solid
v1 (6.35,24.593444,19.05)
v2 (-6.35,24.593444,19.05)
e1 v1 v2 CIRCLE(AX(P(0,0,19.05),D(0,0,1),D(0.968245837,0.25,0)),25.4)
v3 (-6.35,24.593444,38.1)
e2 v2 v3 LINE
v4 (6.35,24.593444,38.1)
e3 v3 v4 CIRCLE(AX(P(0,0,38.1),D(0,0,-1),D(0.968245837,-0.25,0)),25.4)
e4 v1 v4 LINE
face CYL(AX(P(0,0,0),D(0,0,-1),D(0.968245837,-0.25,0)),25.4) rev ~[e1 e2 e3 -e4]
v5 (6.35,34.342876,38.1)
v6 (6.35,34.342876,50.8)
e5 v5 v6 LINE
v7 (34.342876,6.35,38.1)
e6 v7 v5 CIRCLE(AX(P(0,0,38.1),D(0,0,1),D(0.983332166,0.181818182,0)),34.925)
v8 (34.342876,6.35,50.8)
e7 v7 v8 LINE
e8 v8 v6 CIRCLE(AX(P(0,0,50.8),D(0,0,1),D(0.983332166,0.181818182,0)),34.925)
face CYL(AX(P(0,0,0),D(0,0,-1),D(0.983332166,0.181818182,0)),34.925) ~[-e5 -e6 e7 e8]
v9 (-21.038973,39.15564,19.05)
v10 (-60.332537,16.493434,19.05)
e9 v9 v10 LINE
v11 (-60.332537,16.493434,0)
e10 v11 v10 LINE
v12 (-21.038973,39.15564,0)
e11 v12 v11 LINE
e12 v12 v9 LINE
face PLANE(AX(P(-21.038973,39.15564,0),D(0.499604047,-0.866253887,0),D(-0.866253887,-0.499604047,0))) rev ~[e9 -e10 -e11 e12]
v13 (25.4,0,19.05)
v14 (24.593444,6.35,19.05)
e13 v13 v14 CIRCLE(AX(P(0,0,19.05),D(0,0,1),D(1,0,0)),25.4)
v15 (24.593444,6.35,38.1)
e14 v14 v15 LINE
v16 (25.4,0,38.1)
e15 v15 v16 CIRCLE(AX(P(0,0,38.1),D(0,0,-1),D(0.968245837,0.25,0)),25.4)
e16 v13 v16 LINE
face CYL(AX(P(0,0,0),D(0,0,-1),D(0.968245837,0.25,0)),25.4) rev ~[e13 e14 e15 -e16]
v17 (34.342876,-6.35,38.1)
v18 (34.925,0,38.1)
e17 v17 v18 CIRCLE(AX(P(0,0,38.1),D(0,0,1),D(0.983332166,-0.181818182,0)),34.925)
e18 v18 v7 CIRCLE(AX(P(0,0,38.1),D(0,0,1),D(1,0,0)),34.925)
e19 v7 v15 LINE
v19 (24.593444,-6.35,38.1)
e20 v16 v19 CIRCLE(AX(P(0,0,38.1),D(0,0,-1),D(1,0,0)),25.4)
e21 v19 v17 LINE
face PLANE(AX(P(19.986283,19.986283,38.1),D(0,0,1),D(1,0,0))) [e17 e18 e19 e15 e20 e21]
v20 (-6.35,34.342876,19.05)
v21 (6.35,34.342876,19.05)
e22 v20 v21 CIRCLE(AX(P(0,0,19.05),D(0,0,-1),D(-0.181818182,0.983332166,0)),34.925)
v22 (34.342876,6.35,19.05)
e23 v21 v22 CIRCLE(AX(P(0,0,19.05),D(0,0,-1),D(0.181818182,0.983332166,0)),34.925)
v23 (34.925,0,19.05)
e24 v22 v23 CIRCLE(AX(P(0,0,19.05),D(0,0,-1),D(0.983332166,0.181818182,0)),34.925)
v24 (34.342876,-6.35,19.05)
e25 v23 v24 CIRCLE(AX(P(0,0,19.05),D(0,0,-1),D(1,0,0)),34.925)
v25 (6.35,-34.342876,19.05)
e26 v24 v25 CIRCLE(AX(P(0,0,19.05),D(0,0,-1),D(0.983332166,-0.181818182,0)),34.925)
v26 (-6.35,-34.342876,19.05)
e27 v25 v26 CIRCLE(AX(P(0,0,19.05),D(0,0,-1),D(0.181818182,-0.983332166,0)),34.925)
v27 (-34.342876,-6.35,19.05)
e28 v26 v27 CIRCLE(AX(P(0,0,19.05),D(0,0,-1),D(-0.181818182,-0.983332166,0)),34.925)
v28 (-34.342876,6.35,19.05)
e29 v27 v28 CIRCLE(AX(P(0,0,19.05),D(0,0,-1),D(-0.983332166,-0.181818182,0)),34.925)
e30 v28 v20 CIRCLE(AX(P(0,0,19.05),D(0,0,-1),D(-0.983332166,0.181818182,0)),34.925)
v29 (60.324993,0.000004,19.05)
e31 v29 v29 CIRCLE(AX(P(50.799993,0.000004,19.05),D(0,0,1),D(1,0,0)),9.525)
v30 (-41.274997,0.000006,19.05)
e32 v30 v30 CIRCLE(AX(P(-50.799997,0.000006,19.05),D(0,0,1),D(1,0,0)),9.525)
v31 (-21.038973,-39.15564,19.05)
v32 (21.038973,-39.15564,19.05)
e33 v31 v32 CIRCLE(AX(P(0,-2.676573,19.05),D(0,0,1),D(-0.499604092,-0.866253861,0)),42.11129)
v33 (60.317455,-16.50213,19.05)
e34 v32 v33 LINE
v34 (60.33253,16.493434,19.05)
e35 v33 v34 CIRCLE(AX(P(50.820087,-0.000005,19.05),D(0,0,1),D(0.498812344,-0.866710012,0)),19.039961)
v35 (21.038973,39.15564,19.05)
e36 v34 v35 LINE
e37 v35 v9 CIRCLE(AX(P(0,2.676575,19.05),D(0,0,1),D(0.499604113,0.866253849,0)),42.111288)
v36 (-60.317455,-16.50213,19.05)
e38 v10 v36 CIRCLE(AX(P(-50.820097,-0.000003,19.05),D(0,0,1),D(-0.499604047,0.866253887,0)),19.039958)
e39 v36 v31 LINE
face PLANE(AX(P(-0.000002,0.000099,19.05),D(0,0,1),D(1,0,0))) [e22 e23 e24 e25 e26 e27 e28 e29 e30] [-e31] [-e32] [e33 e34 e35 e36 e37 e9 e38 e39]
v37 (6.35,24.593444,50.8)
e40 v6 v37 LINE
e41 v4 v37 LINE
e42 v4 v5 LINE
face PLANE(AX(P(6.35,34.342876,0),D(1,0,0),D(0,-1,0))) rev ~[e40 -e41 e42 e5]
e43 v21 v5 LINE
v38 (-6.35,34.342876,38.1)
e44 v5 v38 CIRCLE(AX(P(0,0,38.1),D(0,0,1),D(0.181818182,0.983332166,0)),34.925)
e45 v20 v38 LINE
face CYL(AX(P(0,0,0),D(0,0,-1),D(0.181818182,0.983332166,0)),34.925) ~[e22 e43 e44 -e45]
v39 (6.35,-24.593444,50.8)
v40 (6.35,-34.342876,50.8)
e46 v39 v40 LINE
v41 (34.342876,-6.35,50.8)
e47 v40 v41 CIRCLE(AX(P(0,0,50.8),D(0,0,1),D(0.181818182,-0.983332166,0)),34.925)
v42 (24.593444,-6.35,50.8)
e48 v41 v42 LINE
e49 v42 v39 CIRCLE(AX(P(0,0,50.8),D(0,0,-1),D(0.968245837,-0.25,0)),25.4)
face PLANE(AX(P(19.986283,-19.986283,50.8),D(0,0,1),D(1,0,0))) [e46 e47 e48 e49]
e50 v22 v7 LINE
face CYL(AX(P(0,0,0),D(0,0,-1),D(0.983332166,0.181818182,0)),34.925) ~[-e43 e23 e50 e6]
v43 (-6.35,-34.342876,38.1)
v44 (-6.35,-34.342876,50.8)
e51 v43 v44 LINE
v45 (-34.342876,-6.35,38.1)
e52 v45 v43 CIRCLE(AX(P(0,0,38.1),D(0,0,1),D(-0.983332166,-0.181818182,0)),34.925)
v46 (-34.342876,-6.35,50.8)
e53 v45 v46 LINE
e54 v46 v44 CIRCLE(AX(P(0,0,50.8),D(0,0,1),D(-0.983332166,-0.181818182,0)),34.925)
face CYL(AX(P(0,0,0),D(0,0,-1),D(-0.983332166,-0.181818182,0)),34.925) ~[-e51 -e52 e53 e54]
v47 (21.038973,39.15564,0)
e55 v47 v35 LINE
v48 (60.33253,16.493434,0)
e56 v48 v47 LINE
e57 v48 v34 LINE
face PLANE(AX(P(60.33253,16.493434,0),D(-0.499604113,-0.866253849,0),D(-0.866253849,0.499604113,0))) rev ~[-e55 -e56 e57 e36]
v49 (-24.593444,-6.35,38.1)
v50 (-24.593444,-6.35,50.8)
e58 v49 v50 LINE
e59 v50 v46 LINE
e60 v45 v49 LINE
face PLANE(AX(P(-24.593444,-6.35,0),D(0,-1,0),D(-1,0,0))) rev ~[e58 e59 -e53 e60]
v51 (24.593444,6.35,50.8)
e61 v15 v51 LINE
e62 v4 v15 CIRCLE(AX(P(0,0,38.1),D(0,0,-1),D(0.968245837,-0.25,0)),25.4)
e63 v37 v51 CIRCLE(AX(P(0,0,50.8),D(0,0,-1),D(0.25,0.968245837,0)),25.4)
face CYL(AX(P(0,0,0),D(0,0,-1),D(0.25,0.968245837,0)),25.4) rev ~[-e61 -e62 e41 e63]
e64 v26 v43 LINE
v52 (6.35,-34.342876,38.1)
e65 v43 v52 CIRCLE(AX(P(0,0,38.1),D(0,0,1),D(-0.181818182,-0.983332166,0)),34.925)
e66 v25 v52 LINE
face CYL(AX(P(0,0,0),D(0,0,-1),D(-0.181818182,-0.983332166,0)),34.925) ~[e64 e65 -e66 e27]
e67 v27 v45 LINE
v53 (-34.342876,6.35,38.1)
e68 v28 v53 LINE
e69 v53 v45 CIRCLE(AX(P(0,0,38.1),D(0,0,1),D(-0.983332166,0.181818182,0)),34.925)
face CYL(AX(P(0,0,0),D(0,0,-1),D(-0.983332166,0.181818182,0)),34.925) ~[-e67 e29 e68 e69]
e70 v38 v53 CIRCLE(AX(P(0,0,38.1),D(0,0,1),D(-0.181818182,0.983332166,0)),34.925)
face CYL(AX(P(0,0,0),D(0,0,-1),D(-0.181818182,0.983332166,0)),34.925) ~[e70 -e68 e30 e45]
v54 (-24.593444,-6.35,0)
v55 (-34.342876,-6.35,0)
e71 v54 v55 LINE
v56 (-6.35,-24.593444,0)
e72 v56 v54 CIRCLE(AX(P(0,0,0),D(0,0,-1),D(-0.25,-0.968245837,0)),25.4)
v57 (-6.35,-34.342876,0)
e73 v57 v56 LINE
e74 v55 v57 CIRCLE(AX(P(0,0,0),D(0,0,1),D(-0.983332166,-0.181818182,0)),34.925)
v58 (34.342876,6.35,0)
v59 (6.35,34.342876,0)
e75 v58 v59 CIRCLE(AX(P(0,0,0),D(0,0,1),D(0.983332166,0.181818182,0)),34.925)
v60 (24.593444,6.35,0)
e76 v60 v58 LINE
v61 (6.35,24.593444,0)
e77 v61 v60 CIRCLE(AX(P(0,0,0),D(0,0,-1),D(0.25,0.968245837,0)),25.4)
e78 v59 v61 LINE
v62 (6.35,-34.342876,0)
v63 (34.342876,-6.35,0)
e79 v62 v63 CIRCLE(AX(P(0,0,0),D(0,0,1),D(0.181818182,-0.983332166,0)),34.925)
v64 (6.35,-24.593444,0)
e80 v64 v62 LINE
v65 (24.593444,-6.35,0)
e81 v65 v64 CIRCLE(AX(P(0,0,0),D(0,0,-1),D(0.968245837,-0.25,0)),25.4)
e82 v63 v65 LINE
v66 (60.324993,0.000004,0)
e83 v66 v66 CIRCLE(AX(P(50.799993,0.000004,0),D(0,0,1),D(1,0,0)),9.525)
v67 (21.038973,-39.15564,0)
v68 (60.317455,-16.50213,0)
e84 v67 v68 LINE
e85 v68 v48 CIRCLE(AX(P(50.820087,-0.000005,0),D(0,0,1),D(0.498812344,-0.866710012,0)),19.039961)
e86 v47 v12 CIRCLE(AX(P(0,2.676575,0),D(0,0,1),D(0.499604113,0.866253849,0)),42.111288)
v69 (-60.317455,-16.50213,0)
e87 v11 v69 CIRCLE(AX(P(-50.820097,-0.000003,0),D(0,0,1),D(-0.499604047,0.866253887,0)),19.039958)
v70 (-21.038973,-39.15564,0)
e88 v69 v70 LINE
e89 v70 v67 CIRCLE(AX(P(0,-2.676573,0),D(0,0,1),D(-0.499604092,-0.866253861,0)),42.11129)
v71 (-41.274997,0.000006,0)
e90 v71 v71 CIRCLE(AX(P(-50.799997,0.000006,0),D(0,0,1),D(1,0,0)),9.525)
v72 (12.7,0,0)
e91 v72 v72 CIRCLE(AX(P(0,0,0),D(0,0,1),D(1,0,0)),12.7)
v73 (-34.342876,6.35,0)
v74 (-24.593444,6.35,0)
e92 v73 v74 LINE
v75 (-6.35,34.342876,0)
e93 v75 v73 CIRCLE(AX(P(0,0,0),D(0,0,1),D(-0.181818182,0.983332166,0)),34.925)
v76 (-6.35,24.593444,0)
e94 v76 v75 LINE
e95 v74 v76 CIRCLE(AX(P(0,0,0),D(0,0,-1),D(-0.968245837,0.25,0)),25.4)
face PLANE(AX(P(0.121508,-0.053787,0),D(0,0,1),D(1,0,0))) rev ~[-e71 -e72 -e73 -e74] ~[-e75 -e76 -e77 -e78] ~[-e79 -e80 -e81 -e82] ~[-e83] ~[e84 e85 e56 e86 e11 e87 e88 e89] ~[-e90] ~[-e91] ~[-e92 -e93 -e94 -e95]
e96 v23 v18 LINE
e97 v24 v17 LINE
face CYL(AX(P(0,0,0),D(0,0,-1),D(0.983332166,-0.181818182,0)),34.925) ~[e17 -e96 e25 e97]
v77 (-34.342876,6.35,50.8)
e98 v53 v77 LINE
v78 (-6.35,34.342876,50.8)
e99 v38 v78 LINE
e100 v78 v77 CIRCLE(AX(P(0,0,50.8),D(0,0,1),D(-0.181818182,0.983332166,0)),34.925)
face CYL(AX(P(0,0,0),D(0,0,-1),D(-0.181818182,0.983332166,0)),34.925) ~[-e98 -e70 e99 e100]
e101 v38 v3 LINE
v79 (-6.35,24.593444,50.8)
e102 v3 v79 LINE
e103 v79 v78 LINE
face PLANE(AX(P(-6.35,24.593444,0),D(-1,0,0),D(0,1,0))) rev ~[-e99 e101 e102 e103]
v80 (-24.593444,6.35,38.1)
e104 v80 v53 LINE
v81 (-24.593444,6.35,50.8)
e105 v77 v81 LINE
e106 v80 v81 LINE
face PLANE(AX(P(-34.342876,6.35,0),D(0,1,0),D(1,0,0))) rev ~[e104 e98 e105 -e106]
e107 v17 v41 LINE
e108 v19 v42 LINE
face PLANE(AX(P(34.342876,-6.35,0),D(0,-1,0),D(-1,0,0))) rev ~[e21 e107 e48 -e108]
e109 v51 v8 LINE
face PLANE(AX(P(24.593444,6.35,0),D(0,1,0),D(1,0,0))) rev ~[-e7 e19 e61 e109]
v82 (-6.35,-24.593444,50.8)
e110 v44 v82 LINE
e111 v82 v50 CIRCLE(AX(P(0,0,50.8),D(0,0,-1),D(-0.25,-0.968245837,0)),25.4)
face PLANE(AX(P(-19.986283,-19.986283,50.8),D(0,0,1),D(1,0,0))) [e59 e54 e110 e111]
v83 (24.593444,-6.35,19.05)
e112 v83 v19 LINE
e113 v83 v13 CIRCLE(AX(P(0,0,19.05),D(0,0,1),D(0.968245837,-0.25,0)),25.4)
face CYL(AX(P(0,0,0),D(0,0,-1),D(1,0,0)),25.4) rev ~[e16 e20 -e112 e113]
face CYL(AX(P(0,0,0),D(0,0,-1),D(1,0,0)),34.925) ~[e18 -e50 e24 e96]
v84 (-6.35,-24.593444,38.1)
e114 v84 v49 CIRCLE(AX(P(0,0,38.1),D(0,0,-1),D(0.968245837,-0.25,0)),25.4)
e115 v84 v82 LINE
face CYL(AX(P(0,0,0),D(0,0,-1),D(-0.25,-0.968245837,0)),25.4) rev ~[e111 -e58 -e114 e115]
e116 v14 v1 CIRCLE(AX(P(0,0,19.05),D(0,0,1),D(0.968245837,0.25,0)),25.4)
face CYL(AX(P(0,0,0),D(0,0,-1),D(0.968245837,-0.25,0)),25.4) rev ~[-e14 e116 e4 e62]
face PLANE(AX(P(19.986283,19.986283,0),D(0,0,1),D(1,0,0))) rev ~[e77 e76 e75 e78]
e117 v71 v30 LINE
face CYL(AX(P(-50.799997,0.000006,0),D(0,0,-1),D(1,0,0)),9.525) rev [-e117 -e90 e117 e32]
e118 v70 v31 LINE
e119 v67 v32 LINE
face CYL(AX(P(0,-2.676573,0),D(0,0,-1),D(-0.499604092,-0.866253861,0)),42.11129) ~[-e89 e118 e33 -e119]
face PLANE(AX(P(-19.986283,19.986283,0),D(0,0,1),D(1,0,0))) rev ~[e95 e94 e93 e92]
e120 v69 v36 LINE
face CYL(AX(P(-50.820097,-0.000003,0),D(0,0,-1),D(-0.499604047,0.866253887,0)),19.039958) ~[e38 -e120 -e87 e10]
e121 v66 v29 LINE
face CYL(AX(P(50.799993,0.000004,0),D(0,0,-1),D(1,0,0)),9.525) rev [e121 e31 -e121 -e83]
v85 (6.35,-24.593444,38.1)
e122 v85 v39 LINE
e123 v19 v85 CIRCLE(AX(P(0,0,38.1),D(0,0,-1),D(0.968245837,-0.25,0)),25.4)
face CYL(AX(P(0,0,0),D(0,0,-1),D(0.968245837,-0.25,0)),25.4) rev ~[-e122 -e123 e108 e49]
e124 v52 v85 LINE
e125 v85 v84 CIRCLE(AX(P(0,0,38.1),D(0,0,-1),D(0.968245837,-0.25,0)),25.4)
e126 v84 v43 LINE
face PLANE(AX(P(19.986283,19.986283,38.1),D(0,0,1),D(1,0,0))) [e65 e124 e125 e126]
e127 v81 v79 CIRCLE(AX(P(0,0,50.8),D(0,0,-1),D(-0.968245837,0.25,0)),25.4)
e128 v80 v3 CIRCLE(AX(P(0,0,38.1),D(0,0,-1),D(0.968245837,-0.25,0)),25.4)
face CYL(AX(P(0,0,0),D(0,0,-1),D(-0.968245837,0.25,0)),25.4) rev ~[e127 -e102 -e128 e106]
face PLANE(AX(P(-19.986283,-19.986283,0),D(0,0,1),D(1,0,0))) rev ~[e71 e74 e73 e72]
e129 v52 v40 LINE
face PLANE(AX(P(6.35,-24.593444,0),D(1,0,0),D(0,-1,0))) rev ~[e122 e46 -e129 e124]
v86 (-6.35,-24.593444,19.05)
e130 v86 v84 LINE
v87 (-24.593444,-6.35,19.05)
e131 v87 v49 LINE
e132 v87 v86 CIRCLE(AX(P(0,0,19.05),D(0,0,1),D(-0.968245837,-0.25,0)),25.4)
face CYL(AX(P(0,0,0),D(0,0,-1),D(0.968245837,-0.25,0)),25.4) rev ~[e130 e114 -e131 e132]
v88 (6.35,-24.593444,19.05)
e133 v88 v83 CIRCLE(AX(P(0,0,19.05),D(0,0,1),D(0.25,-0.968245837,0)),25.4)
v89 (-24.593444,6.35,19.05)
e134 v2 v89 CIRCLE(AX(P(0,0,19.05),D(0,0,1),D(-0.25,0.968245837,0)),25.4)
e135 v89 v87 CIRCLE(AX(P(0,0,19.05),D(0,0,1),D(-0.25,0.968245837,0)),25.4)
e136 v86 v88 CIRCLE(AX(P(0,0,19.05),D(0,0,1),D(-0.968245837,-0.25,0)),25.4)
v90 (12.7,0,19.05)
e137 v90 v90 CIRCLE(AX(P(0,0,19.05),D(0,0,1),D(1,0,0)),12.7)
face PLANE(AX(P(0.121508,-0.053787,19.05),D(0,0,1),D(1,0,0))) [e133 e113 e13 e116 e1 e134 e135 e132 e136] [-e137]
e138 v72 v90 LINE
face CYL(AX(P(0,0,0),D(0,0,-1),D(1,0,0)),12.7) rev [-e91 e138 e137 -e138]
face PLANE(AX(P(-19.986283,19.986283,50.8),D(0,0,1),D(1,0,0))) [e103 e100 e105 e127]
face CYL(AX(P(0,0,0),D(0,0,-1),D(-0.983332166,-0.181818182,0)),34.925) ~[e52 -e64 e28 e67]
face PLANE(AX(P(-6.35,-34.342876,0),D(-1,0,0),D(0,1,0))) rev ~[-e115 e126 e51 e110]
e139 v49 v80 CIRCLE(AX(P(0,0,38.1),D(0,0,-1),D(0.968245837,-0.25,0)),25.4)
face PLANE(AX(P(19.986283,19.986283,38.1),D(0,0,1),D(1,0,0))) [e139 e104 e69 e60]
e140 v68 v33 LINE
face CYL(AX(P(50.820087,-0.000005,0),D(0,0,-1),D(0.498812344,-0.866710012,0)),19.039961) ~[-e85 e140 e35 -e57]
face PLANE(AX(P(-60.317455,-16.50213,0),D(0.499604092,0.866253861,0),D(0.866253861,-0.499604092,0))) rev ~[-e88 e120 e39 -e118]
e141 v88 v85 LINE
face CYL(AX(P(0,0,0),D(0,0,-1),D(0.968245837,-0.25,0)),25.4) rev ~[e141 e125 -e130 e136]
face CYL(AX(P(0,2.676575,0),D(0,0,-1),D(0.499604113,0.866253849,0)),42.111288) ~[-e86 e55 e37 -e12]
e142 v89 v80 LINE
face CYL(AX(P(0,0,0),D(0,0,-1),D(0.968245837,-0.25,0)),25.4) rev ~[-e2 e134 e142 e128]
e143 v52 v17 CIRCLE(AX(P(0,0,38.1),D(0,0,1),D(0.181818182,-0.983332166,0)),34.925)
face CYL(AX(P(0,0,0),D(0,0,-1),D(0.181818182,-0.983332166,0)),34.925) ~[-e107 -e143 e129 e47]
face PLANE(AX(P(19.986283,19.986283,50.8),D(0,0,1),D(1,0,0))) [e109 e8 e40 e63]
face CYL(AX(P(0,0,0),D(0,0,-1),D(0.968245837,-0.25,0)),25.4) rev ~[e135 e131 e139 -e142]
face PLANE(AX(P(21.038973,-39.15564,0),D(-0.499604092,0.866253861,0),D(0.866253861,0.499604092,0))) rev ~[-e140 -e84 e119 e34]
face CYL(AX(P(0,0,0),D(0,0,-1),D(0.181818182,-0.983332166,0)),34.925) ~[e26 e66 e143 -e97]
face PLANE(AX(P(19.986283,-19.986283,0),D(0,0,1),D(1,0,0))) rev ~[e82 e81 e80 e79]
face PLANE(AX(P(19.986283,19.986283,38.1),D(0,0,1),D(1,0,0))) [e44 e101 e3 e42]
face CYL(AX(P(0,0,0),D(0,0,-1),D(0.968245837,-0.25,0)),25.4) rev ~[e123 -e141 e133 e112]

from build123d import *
from build123d import SkipClean  # not in build123d's __all__

# Parameters (mm, degrees)
F1_DEPTH = 38.1
F0_R     = 9.525
F2_DEPTH = 19.05
F0_R_2   = 12.7
F3_DEPTH = 19.05
F4_DEPTH = 50.8


with BuildPart() as f1:
    # F0 (on Top) → F1 (new body)
    with BuildSketch(Plane.XY):
        with BuildLine():
            ThreePointArc((6.35, 24.5934442484), (17.9605122421, 17.9605122421), (24.5934442484, 6.35))
            Line((24.5934442484, 6.35), (34.3428758988, 6.35))
            ThreePointArc((34.3428758988, 6.35), (24.6957043329, 24.6957043329), (6.35, 34.3428758988))
            Line((6.35, 34.3428758988), (6.35, 24.5934442484))
        make_face()
        with BuildLine():
            ThreePointArc((-6.35, 24.5934442484), (0, 25.4), (6.35, 24.5934442484))
            Line((6.35, 24.5934442484), (6.35, 34.3428758988))
            ThreePointArc((6.35, 34.3428758988), (0, 34.925), (-6.35, 34.3428758988))
            Line((-6.35, 34.3428758988), (-6.35, 24.5934442484))
        make_face()
        with BuildLine():
            ThreePointArc((-24.5934442484, 6.35), (-17.9605122421, 17.9605122421), (-6.35, 24.5934442484))
            Line((-6.35, 24.5934442484), (-6.35, 34.3428758988))
            ThreePointArc((-6.35, 34.3428758988), (-24.6957043329, 24.6957043329), (-34.3428758988, 6.35))
            Line((-34.3428758988, 6.35), (-24.5934442484, 6.35))
        make_face()
        with BuildLine():
            ThreePointArc((-24.5934442484, -6.35), (-25.4, 0), (-24.5934442484, 6.35))
            Line((-24.5934442484, 6.35), (-34.3428758988, 6.35))
            ThreePointArc((-34.3428758988, 6.35), (-34.925, 0), (-34.3428758988, -6.35))
            Line((-34.3428758988, -6.35), (-24.5934442484, -6.35))
        make_face()
        with BuildLine():
            Line((-6.35, -34.3428758988), (-6.35, -24.5934442484))
            ThreePointArc((-6.35, -24.5934442484), (-17.9605122421, -17.9605122421), (-24.5934442484, -6.35))
            Line((-24.5934442484, -6.35), (-34.3428758988, -6.35))
            ThreePointArc((-34.3428758988, -6.35), (-24.6957043329, -24.6957043329), (-6.35, -34.3428758988))
        make_face()
        with BuildLine():
            Line((6.35, -34.3428758988), (6.35, -24.5934442484))
            ThreePointArc((6.35, -24.5934442484), (0, -25.4), (-6.35, -24.5934442484))
            Line((-6.35, -24.5934442484), (-6.35, -34.3428758988))
            ThreePointArc((-6.35, -34.3428758988), (0, -34.925), (6.35, -34.3428758988))
        make_face()
        with BuildLine():
            Line((34.3428758988, -6.35), (24.5934442484, -6.35))
            ThreePointArc((24.5934442484, -6.35), (17.9605122421, -17.9605122421), (6.35, -24.5934442484))
            Line((6.35, -24.5934442484), (6.35, -34.3428758988))
            ThreePointArc((6.35, -34.3428758988), (24.6957043329, -24.6957043329), (34.3428758988, -6.35))
        make_face()
        with BuildLine():
            ThreePointArc((24.5934442484, 6.35), (25.1975542852, 3.2005090291), (25.4, 0))
            ThreePointArc((25.4, 0), (25.1975542852, -3.2005090291), (24.5934442484, -6.35))
            Line((24.5934442484, -6.35), (34.3428758988, -6.35))
            ThreePointArc((34.3428758988, -6.35), (34.7791644937, -3.1883133656), (34.925, 0))
            ThreePointArc((34.925, 0), (34.7791644937, 3.1883133656), (34.3428758988, 6.35))
            Line((34.3428758988, 6.35), (24.5934442484, 6.35))
        make_face()
    extrude(amount=F1_DEPTH)

    # F0 (on Top) → F2 (join)
    with BuildSketch(Plane.XY):
        with BuildLine():
            Line((-60.3174545175, -16.5021301071), (-21.0389726486, -39.1556398223))
            ThreePointArc((-21.0389726486, -39.1556398223), (0, -44.7878622326), (21.0389726486, -39.1556398223))
            Line((21.0389726486, -39.1556398223), (60.3174545175, -16.5021301071))
            ThreePointArc((60.3174545175, -16.5021301071), (69.8600459872, -0.008704331), (60.3325297632, 16.4934343301))
            Line((60.3325297632, 16.4934343301), (21.0389726486, 39.1556398223))
            ThreePointArc((21.0389726486, 39.1556398223), (0, 44.787862505), (-21.0389726486, 39.1556398223))
            Line((-21.0389726486, 39.1556398223), (-60.332536636, 16.4934343301))
            ThreePointArc((-60.332536636, 16.4934343301), (-69.8600525487, -0.0087063185), (-60.3174545175, -16.5021301071))
        make_face()
        with BuildLine():
            ThreePointArc((6.35, 34.3428758988), (24.6957043329, 24.6957043329), (34.3428758988, 6.35))
            ThreePointArc((34.3428758988, 6.35), (34.7791644937, 3.1883133656), (34.925, 0))
            ThreePointArc((34.925, 0), (34.7791644937, -3.1883133656), (34.3428758988, -6.35))
            ThreePointArc((34.3428758988, -6.35), (24.6957043329, -24.6957043329), (6.35, -34.3428758988))
            ThreePointArc((6.35, -34.3428758988), (0, -34.925), (-6.35, -34.3428758988))
            ThreePointArc((-6.35, -34.3428758988), (-24.6957043329, -24.6957043329), (-34.3428758988, -6.35))
            ThreePointArc((-34.3428758988, -6.35), (-34.925, 0), (-34.3428758988, 6.35))
            ThreePointArc((-34.3428758988, 6.35), (-24.6957043329, 24.6957043329), (-6.35, 34.3428758988))
            ThreePointArc((-6.35, 34.3428758988), (0, 34.925), (6.35, 34.3428758988))
        make_face(mode=Mode.SUBTRACT)
        with Locations((-50.7999965718, 5.9441e-06)):
            Circle(F0_R, mode=Mode.SUBTRACT)
        with Locations((50.7999931345, 3.9617e-06)):
            Circle(F0_R, mode=Mode.SUBTRACT)
    extrude(amount=F2_DEPTH)

    # F0 (on Top) → F3 (join)
    with BuildSketch(Plane.XY):
        with BuildLine():
            ThreePointArc((24.5934442484, -6.35), (25.1975542852, -3.2005090291), (25.4, 0))
            ThreePointArc((25.4, 0), (25.1975542852, 3.2005090291), (24.5934442484, 6.35))
            ThreePointArc((24.5934442484, 6.35), (17.9605122421, 17.9605122421), (6.35, 24.5934442484))
            ThreePointArc((6.35, 24.5934442484), (0, 25.4), (-6.35, 24.5934442484))
            ThreePointArc((-6.35, 24.5934442484), (-17.9605122421, 17.9605122421), (-24.5934442484, 6.35))
            ThreePointArc((-24.5934442484, 6.35), (-25.4, 0), (-24.5934442484, -6.35))
            ThreePointArc((-24.5934442484, -6.35), (-17.9605122421, -17.9605122421), (-6.35, -24.5934442484))
            ThreePointArc((-6.35, -24.5934442484), (0, -25.4), (6.35, -24.5934442484))
            ThreePointArc((6.35, -24.5934442484), (17.9605122421, -17.9605122421), (24.5934442484, -6.35))
        make_face()
        Circle(F0_R_2, mode=Mode.SUBTRACT)
    extrude(amount=F3_DEPTH)

    # F0 (on Top) → F4 (join)
    with BuildSketch(Plane.XY):
        with BuildLine():
            ThreePointArc((-24.5934442484, 6.35), (-17.9605122421, 17.9605122421), (-6.35, 24.5934442484))
            Line((-6.35, 24.5934442484), (-6.35, 34.3428758988))
            ThreePointArc((-6.35, 34.3428758988), (-24.6957043329, 24.6957043329), (-34.3428758988, 6.35))
            Line((-34.3428758988, 6.35), (-24.5934442484, 6.35))
        make_face()
        with BuildLine():
            ThreePointArc((6.35, 24.5934442484), (17.9605122421, 17.9605122421), (24.5934442484, 6.35))
            Line((24.5934442484, 6.35), (34.3428758988, 6.35))
            ThreePointArc((34.3428758988, 6.35), (24.6957043329, 24.6957043329), (6.35, 34.3428758988))
            Line((6.35, 34.3428758988), (6.35, 24.5934442484))
        make_face()
        with BuildLine():
            Line((34.3428758988, -6.35), (24.5934442484, -6.35))
            ThreePointArc((24.5934442484, -6.35), (17.9605122421, -17.9605122421), (6.35, -24.5934442484))
            Line((6.35, -24.5934442484), (6.35, -34.3428758988))
            ThreePointArc((6.35, -34.3428758988), (24.6957043329, -24.6957043329), (34.3428758988, -6.35))
        make_face()
        with BuildLine():
            Line((-6.35, -34.3428758988), (-6.35, -24.5934442484))
            ThreePointArc((-6.35, -24.5934442484), (-17.9605122421, -17.9605122421), (-24.5934442484, -6.35))
            Line((-24.5934442484, -6.35), (-34.3428758988, -6.35))
            ThreePointArc((-34.3428758988, -6.35), (-24.6957043329, -24.6957043329), (-6.35, -34.3428758988))
        make_face()
    with SkipClean():  # cleaning this boolean's faces spoils the solid; the shape is the same uncleaned
        extrude(amount=F4_DEPTH)


solid = f1.part
